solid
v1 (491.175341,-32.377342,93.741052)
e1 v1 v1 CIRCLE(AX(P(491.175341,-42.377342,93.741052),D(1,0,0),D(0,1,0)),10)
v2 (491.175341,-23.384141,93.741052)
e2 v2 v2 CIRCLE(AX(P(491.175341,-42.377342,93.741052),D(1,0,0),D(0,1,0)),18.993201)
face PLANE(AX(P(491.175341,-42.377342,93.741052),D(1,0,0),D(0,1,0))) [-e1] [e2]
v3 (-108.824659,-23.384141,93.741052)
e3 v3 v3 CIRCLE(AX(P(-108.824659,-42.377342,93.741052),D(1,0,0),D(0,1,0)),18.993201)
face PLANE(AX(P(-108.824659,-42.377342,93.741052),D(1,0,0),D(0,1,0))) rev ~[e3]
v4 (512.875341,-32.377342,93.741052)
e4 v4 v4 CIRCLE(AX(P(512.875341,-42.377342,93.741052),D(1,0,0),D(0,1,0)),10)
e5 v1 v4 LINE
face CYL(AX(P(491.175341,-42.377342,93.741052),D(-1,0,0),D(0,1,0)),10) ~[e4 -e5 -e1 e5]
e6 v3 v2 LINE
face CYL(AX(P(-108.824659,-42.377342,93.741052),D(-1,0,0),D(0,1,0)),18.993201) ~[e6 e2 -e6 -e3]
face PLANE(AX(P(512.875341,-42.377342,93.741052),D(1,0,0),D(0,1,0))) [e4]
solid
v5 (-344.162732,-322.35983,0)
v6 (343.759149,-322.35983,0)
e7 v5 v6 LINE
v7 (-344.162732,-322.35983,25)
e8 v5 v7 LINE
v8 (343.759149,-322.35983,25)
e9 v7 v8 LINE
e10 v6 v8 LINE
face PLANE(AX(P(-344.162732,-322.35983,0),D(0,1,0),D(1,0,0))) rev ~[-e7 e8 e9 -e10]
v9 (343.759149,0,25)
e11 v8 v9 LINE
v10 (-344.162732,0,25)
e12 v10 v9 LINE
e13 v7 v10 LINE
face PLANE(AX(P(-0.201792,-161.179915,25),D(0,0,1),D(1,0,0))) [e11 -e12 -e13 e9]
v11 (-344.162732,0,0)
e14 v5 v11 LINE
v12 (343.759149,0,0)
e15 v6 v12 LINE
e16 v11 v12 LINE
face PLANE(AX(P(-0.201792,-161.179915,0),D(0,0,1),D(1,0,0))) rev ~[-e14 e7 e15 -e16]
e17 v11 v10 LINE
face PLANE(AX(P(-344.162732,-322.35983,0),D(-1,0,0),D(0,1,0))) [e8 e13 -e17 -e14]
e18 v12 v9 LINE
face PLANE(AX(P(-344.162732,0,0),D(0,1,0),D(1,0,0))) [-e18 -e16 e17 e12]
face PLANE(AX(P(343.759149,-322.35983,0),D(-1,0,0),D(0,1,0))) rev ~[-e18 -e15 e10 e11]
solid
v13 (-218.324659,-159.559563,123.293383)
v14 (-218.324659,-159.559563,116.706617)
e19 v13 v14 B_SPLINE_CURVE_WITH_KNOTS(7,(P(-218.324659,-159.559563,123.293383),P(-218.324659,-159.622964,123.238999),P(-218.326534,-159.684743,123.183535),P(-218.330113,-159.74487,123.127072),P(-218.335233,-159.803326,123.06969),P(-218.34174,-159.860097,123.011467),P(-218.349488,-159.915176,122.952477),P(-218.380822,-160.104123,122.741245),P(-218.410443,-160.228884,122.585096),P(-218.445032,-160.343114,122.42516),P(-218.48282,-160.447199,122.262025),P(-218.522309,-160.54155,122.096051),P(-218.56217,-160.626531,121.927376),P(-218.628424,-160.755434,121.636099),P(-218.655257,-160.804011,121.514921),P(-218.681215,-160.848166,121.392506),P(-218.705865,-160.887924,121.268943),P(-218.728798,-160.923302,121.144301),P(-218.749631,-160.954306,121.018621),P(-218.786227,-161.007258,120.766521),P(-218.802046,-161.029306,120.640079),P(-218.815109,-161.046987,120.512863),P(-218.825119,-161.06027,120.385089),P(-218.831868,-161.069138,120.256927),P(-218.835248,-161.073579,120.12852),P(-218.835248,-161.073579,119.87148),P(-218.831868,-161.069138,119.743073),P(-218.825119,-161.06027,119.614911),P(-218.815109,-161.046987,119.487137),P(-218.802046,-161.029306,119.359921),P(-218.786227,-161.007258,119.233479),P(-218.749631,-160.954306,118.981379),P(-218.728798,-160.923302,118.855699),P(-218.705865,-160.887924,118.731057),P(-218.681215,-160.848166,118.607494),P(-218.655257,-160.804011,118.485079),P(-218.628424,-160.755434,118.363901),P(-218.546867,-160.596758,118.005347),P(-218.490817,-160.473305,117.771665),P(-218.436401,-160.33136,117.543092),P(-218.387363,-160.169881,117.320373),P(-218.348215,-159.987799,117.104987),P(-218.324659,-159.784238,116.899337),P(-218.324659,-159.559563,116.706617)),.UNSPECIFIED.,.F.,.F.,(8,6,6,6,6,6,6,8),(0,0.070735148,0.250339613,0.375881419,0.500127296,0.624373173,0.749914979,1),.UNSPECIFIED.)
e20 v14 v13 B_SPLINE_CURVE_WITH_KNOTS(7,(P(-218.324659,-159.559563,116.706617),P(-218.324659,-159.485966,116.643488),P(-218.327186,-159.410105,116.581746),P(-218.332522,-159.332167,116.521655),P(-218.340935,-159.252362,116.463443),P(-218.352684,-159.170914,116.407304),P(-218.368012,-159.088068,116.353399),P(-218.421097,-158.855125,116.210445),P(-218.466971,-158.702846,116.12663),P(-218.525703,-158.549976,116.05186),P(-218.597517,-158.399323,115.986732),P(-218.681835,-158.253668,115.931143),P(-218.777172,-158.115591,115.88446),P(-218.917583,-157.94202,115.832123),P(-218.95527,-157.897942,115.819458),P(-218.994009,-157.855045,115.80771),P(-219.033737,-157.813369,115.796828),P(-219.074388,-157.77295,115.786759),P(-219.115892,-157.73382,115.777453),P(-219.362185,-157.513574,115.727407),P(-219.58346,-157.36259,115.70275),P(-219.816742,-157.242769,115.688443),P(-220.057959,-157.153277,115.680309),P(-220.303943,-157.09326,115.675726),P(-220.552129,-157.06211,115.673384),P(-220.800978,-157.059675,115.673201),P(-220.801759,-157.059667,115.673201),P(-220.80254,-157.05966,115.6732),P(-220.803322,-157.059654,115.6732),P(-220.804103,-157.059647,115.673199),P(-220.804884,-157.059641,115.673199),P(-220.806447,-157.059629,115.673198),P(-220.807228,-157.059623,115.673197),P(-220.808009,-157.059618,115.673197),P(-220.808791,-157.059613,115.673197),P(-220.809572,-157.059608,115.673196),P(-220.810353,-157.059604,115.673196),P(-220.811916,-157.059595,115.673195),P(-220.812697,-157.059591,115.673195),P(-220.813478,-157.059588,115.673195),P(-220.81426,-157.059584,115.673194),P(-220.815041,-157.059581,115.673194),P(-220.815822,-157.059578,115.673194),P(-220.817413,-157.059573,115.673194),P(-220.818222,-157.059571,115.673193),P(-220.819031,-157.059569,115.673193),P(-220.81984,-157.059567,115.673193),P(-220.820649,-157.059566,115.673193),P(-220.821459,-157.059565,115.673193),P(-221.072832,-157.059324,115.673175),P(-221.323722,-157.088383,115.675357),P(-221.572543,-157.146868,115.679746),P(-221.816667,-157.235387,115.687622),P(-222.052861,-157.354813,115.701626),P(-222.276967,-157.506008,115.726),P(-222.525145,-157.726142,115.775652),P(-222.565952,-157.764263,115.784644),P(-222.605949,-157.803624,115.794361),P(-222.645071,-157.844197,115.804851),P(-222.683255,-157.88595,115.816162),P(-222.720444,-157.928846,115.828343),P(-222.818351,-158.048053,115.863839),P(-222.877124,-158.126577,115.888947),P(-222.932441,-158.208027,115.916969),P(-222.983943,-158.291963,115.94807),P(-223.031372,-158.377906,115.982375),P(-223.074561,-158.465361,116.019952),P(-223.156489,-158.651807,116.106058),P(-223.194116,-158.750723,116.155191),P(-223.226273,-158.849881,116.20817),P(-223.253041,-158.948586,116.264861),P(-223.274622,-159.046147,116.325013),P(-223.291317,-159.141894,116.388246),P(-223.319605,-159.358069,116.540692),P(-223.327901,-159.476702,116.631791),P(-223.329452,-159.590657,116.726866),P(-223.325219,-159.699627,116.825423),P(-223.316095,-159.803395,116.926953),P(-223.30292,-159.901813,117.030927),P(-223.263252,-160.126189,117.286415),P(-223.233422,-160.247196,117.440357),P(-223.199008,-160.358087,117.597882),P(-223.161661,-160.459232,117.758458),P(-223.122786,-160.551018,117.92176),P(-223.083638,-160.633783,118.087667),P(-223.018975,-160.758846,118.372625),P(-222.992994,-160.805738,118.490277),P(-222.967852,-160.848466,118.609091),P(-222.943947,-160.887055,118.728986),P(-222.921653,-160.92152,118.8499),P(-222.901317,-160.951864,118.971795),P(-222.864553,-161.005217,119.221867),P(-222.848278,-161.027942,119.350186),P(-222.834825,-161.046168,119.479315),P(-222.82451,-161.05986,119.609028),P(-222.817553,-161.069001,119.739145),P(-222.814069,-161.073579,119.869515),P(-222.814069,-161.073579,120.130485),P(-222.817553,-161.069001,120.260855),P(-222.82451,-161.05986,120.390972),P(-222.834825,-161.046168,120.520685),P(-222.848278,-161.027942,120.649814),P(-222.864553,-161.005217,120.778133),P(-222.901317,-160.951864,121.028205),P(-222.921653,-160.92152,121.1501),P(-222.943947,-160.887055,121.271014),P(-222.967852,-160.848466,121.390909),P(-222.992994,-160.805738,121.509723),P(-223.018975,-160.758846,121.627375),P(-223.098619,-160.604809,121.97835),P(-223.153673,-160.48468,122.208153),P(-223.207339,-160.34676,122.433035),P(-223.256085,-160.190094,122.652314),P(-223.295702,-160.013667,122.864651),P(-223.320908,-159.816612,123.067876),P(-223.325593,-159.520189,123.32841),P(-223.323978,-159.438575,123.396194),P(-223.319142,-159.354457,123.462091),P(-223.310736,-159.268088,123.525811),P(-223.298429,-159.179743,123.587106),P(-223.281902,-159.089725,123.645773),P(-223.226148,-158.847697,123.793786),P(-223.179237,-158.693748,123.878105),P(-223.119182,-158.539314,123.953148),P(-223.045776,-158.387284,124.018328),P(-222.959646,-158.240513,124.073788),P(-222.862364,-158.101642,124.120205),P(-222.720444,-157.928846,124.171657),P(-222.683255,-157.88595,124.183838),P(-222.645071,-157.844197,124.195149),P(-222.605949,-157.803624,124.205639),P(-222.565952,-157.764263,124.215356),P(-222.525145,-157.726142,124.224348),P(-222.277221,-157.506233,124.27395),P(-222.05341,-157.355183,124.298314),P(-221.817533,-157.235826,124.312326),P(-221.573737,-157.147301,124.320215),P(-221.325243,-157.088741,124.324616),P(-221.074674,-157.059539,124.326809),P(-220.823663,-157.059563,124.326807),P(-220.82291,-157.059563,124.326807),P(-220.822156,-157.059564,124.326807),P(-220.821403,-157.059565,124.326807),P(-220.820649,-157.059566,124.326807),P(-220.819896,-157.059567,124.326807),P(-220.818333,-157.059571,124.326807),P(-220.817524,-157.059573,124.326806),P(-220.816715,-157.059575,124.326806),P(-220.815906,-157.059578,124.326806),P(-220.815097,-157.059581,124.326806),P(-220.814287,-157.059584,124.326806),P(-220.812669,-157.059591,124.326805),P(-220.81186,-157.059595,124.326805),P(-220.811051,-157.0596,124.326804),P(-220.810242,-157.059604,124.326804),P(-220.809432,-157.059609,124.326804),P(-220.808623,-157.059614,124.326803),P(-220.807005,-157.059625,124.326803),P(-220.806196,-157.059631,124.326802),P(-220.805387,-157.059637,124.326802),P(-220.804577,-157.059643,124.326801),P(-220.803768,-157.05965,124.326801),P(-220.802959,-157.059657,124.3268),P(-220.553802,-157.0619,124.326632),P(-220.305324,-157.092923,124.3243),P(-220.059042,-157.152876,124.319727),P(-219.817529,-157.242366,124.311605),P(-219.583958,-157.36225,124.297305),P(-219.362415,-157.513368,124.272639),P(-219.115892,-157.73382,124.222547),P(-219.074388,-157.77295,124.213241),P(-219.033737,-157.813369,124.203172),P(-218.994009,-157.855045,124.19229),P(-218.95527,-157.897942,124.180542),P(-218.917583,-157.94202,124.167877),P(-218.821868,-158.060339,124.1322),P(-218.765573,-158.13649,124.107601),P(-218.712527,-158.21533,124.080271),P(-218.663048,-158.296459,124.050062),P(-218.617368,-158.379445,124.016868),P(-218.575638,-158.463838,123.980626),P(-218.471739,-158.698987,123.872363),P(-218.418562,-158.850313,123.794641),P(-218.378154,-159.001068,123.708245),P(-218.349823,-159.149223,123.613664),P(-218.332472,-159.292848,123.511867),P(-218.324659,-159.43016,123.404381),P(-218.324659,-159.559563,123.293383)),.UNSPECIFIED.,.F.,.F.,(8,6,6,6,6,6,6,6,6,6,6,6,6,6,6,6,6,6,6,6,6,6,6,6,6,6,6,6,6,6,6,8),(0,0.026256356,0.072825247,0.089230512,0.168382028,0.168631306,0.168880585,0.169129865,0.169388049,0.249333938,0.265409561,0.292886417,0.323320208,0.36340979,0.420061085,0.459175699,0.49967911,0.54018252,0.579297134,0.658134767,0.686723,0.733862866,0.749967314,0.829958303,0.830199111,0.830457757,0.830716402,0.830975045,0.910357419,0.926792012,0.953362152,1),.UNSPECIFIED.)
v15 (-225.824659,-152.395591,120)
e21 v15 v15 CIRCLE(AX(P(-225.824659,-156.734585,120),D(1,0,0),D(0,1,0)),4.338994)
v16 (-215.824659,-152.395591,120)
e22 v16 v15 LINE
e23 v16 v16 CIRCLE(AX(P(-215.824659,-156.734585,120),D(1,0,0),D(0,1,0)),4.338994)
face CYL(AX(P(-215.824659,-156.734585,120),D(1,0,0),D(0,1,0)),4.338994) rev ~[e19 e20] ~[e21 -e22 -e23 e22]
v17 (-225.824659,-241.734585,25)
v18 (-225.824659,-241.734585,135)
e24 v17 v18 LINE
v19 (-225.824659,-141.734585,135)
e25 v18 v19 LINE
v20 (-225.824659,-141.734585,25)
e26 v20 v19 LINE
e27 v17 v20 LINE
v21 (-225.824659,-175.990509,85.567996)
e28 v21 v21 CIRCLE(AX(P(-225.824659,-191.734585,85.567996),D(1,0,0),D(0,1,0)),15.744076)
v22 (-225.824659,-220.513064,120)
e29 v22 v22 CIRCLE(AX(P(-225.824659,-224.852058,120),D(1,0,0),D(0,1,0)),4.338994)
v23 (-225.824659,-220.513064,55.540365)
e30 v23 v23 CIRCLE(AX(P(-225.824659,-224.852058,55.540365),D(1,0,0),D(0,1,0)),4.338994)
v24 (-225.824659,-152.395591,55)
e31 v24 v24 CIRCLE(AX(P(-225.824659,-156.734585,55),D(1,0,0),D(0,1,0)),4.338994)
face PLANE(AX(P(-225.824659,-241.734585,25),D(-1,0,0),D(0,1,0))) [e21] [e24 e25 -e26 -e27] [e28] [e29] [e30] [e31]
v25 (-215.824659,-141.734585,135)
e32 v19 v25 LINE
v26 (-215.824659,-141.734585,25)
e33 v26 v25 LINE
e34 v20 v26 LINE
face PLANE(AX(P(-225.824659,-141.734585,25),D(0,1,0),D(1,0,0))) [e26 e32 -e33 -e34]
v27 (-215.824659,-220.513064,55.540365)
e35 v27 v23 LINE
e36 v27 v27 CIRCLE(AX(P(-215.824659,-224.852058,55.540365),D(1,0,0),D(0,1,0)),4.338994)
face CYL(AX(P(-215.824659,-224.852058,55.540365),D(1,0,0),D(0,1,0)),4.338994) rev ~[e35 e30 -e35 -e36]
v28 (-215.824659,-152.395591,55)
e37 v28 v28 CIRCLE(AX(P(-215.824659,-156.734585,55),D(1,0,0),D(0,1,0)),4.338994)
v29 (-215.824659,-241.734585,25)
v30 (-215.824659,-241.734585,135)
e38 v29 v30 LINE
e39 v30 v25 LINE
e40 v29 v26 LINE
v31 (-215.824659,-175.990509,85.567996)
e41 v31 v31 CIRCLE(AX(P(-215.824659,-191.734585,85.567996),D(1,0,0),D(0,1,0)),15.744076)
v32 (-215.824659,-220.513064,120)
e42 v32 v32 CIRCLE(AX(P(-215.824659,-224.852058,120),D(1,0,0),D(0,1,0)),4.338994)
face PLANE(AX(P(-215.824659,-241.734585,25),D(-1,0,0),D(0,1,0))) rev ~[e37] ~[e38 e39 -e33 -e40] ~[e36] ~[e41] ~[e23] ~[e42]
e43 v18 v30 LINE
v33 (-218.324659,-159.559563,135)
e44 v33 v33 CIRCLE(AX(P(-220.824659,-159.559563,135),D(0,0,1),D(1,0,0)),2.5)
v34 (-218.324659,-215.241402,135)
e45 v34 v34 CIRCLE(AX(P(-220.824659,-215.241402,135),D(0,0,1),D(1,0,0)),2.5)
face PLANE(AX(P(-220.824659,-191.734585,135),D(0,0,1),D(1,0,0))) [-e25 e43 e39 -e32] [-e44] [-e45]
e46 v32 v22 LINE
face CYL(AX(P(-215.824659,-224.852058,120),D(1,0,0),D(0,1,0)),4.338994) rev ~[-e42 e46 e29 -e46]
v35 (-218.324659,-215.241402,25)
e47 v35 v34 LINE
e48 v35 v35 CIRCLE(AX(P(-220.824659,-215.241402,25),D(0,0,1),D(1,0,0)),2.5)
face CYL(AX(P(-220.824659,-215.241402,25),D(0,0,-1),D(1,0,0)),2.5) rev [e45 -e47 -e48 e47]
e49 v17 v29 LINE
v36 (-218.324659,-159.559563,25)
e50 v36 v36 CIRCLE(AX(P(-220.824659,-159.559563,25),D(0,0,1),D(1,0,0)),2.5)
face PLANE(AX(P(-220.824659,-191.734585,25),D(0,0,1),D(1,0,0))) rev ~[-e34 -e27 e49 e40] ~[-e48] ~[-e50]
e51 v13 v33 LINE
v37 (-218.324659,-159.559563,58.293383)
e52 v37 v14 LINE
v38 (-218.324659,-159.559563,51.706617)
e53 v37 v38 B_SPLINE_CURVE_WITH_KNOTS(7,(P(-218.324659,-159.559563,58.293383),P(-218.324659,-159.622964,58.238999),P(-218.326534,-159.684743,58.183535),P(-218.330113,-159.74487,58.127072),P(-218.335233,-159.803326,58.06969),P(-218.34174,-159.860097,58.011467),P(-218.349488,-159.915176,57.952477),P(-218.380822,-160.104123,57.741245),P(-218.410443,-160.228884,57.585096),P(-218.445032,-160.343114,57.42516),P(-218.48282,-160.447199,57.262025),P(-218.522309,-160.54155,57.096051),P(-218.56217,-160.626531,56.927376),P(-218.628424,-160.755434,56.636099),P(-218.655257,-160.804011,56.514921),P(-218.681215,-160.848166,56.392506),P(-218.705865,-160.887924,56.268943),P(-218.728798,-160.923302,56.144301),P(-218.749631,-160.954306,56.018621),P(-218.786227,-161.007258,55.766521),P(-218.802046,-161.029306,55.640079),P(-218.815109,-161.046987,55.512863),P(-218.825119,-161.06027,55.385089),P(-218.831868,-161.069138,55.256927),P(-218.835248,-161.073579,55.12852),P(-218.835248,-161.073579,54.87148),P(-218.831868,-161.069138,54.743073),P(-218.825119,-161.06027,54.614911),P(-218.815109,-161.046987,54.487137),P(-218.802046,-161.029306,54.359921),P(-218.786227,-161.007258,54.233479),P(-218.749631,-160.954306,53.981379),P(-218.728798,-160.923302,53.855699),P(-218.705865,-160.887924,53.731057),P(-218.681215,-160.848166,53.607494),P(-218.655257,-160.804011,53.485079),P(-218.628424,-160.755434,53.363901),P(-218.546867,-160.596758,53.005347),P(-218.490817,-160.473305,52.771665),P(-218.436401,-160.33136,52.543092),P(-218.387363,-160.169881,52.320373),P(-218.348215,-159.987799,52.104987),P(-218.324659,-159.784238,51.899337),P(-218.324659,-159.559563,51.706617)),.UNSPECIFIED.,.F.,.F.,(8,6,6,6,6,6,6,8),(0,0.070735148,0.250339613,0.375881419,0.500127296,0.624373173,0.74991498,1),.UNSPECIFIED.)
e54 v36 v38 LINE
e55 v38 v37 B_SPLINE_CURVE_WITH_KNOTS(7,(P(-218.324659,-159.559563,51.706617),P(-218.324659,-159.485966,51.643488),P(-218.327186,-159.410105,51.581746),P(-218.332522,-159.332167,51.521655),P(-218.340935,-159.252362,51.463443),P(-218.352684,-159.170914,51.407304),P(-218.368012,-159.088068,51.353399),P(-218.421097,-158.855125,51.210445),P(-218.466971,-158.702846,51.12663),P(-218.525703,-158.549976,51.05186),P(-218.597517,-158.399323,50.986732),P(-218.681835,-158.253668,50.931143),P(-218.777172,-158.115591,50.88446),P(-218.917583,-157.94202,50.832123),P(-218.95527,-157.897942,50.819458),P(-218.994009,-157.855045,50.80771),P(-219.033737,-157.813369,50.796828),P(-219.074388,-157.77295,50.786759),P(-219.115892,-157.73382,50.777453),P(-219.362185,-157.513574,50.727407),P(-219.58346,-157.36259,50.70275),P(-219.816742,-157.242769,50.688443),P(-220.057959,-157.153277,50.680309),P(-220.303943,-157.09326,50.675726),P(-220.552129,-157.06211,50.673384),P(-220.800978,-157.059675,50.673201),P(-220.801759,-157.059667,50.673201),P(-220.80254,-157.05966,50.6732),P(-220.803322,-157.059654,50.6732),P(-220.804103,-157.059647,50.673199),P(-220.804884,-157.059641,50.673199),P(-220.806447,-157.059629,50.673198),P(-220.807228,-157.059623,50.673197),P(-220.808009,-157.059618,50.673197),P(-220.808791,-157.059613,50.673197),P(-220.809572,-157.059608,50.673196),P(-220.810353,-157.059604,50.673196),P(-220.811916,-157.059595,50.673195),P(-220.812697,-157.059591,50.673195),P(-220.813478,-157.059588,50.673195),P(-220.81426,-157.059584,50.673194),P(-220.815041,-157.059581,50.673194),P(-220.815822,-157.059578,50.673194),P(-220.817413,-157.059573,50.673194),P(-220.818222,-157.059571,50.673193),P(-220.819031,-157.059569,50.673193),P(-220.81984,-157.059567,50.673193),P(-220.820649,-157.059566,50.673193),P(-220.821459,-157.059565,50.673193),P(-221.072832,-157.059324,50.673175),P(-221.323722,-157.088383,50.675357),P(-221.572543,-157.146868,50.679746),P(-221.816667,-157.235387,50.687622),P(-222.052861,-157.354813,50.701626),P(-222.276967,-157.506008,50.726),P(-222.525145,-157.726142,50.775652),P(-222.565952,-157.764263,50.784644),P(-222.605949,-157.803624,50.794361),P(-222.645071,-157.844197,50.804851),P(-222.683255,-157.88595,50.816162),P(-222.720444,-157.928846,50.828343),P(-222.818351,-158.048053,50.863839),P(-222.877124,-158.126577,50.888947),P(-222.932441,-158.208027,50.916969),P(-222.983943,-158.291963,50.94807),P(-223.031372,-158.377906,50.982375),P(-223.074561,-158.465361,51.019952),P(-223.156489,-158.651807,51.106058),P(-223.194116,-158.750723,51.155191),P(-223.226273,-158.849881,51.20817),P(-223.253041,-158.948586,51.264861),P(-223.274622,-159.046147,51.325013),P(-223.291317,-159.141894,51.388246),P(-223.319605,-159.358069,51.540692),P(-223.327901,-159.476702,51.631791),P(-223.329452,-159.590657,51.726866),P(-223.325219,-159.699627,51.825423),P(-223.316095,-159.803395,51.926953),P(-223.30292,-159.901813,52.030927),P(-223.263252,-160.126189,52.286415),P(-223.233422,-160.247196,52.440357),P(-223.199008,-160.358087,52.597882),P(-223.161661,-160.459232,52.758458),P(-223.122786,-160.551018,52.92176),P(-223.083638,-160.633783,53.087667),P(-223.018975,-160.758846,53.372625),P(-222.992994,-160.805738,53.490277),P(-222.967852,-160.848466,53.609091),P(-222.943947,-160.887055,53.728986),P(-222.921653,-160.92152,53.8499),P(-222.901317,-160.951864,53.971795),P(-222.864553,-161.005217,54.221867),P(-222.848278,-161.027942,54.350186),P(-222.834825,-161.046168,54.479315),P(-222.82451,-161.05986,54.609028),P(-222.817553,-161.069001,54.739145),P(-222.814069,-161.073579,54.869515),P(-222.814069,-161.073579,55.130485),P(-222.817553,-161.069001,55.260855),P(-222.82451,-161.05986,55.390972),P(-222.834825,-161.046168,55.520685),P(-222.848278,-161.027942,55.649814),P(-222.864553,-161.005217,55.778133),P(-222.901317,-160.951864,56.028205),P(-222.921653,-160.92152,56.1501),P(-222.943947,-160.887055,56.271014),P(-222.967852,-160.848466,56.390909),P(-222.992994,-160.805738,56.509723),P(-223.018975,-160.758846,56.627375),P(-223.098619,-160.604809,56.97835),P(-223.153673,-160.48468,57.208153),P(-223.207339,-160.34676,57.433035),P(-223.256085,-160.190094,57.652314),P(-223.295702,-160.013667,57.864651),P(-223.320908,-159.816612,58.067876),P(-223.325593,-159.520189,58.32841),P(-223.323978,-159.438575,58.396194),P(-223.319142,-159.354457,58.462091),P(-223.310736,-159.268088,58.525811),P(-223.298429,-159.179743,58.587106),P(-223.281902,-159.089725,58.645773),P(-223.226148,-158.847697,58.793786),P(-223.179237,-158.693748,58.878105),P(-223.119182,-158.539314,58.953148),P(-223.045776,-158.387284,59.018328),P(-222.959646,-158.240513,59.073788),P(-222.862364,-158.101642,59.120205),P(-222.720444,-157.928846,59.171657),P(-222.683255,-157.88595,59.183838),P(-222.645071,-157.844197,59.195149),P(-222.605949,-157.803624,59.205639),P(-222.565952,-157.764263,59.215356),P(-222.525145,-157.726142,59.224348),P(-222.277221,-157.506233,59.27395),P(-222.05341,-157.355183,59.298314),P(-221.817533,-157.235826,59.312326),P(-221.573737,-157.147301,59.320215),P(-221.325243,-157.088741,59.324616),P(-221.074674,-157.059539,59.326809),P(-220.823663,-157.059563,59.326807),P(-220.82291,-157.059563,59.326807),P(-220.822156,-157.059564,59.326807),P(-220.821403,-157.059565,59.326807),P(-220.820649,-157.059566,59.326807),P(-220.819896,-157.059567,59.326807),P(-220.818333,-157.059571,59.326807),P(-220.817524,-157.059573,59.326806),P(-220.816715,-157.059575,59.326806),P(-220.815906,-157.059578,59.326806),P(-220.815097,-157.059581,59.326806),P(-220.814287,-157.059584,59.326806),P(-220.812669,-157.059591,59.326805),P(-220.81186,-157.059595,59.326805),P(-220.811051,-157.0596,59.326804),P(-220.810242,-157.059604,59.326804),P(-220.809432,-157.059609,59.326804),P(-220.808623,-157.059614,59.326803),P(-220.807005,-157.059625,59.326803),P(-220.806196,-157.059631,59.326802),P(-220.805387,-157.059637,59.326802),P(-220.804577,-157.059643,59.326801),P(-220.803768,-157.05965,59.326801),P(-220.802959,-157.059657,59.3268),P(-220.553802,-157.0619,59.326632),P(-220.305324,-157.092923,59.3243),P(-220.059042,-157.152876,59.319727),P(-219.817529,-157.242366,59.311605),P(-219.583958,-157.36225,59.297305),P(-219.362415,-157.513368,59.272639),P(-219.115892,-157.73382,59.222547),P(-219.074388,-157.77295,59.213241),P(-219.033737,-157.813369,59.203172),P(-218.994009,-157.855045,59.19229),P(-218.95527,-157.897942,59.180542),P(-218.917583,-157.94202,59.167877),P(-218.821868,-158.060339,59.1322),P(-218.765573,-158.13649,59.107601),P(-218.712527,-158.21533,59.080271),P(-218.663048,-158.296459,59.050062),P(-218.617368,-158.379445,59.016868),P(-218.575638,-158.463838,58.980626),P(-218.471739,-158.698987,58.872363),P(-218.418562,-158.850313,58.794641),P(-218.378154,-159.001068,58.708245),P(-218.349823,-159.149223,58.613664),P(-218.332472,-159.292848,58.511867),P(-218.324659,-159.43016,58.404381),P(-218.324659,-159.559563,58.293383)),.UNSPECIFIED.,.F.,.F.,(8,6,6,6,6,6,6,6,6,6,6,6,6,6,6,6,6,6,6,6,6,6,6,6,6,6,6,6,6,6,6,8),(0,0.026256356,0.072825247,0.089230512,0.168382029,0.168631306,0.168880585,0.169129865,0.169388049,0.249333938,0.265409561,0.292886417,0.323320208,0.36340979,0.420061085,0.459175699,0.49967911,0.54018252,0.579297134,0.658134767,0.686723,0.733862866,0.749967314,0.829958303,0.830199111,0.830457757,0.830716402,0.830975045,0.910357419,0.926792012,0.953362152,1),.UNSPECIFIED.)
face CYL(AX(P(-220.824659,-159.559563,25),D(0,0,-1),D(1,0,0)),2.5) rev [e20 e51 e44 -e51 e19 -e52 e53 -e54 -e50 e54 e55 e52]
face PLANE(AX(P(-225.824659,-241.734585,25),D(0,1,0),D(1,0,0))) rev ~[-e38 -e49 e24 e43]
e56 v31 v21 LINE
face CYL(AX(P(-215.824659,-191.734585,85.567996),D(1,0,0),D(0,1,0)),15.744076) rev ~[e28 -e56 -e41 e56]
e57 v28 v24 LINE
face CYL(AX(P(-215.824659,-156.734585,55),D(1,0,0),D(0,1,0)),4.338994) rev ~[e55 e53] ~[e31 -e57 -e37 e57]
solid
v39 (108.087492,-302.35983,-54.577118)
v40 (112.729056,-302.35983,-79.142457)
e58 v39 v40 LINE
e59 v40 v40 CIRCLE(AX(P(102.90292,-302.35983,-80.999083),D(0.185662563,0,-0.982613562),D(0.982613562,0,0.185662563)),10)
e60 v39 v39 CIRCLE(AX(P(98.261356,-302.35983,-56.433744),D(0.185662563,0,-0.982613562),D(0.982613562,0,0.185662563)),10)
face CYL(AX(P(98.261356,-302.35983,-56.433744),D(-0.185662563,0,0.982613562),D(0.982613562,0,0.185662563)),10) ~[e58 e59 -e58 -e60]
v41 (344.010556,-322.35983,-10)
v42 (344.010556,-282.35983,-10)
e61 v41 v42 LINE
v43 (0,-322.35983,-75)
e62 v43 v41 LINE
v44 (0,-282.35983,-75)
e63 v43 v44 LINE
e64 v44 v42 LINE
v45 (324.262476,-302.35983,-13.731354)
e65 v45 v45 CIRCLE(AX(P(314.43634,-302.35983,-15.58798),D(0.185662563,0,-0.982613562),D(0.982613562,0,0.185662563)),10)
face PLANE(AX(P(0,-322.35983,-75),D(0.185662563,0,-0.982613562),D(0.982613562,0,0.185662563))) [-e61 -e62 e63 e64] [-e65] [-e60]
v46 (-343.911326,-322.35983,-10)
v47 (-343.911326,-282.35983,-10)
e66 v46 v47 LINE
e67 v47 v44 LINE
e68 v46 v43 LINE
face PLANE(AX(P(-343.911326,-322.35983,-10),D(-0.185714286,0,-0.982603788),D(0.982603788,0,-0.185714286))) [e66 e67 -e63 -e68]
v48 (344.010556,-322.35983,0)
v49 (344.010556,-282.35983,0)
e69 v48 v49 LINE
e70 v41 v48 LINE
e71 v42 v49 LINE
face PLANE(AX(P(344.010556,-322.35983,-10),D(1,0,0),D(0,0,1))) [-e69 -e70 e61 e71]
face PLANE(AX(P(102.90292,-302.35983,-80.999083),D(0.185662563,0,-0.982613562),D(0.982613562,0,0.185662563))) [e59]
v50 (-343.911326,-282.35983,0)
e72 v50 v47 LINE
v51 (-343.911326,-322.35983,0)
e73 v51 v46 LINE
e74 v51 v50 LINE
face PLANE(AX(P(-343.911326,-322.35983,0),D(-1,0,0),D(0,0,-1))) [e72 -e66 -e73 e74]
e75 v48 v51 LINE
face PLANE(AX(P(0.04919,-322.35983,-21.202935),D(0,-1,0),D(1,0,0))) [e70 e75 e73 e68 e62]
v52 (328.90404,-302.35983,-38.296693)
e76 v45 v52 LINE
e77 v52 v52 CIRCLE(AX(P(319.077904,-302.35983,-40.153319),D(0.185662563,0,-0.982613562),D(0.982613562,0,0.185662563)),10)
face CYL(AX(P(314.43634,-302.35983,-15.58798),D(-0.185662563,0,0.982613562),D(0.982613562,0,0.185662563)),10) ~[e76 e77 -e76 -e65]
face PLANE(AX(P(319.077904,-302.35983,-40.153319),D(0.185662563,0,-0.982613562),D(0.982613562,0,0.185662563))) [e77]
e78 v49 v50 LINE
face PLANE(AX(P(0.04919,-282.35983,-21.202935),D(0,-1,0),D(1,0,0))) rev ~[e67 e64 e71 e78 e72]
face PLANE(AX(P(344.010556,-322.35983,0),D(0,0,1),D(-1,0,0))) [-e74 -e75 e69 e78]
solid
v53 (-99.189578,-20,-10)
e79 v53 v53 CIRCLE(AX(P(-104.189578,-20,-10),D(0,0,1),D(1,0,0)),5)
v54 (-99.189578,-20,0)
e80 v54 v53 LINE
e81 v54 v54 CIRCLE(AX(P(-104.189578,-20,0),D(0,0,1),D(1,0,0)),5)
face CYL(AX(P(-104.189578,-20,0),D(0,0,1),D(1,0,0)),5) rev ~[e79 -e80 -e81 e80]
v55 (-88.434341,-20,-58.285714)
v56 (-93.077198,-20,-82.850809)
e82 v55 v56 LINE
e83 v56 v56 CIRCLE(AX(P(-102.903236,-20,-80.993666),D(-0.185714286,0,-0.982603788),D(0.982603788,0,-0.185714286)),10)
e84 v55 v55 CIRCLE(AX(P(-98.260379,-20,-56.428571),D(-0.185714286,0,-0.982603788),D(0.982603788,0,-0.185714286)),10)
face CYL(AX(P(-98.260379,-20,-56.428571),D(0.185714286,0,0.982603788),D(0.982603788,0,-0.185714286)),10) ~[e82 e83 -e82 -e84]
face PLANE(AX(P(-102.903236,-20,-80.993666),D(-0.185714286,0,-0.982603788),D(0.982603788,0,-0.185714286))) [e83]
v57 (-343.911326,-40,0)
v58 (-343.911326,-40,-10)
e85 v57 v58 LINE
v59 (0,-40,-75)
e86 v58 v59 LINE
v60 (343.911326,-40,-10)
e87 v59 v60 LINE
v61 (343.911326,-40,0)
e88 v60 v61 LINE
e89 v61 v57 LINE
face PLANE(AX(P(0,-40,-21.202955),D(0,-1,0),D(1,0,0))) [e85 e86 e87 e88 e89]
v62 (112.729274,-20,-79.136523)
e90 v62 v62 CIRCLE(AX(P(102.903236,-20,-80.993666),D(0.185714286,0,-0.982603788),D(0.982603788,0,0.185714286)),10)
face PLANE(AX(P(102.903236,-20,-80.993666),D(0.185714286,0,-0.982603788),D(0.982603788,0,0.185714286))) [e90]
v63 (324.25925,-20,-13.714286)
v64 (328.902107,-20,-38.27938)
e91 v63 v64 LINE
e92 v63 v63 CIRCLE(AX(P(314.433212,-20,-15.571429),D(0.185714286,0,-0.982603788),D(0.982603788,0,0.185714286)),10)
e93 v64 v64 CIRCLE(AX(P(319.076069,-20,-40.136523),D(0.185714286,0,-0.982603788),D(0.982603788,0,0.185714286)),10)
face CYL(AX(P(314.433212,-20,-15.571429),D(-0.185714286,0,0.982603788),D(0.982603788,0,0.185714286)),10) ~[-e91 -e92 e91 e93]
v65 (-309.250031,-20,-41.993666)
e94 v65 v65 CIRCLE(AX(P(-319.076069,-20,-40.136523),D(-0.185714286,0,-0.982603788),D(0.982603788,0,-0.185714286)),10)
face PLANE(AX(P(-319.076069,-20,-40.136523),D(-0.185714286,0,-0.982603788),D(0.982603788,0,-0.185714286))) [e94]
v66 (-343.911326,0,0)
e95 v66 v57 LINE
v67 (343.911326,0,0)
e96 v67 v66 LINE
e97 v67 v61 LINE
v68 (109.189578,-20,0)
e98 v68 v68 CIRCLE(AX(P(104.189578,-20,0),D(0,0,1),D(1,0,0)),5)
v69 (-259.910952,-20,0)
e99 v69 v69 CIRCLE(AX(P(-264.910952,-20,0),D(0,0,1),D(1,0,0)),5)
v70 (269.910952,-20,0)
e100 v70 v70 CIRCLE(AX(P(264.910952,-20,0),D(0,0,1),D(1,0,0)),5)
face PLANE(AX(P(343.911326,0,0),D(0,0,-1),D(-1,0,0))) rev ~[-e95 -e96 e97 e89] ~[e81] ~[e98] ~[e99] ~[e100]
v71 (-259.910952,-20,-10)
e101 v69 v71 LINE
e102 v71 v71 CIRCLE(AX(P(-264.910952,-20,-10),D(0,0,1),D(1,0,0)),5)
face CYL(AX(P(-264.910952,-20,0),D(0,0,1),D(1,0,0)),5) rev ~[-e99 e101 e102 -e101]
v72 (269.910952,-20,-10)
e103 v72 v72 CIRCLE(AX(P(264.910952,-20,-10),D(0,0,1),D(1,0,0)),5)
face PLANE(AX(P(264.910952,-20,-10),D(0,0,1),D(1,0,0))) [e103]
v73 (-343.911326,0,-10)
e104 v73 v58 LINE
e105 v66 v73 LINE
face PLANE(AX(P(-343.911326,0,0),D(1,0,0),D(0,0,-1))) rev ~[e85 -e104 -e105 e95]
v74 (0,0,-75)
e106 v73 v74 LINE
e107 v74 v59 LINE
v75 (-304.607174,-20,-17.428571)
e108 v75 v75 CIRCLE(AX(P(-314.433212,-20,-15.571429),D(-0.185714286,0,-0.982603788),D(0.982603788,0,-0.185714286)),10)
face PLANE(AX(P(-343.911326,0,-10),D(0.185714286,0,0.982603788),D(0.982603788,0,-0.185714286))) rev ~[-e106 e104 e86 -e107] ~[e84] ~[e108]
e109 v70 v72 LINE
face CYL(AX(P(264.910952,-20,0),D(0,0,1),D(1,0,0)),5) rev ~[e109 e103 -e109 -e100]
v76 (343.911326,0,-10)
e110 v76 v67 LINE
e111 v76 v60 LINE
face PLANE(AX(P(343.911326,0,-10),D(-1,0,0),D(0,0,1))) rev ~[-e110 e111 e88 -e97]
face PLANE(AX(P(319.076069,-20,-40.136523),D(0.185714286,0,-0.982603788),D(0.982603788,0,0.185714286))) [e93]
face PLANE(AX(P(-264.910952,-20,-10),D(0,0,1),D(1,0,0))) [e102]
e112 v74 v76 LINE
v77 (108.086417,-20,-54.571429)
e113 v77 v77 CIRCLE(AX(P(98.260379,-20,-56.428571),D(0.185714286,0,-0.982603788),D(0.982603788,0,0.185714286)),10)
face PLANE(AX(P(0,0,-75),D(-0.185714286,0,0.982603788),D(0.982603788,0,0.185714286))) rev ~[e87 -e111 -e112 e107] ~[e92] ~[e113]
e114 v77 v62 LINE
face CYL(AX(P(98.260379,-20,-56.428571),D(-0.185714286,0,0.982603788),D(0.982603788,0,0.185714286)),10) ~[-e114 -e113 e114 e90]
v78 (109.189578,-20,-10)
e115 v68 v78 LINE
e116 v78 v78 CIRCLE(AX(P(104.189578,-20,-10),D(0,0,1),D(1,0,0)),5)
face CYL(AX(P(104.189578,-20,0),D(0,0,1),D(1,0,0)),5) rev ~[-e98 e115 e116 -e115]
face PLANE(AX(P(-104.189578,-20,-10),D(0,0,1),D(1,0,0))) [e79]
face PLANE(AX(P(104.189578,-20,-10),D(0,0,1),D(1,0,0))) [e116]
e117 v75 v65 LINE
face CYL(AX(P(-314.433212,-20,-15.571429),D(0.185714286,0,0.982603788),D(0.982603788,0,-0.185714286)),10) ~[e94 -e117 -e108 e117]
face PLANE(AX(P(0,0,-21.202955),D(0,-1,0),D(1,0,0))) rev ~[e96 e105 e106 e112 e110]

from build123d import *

# Parameters (mm, degrees)
F1_DEPTH  = 40
F2_R      = 5
F3_DEPTH  = 10
F4_R      = 10
F5_DEPTH  = 25
F6_R      = 10
F7_DEPTH  = 25
F8_W      = 687.9218816757
F8_H      = 322.3598301411
F9_DEPTH  = 25
F11_DEPTH = 40
F12_R     = 10
F13_DEPTH = 25
F14_W     = 10
F14_H     = 100
F14_R     = 2.5
F15_DEPTH = 110
F16_R     = 4.3389942533
F16_R_2   = 15.7440759203
F17_DEPTH = 66
F20_R     = 18.9932010267
F21_DEPTH = 600
F22_R     = 10
F23_DEPTH = 21.7


# Not quite as in the source:
# - the program builds the solid bodies; features that only make, move or delete a surface that nothing else refers to are left out


with BuildPart() as f1:
    # F0 (on Front) → F1 (new body)
    with BuildSketch(Plane.XZ):
        Polygon((343.9113257804, 0), (-343.9113257804, 0), (-343.9113257804, -10), (0, -75), (343.9113257804, -10), align=None)
    extrude(amount=F1_DEPTH)

    # F2 (on face) → F3 (cut)
    with BuildSketch(Plane.XY):
        with Locations((-264.9109515785, -20)):
            Circle(F2_R)
        with Locations((-104.1895777367, -20)):
            Circle(F2_R)
        with Locations((104.1895777367, -20)):
            Circle(F2_R)
        with Locations((264.9109515785, -20)):
            Circle(F2_R)
    extrude(amount=-F3_DEPTH, mode=Mode.SUBTRACT)

    # F4 (on face) → F5 (join)
    with BuildSketch(Plane(origin=(-13.6862670464, 0, -72.4132653061), x_dir=(0.9826037879, 0, -0.1857142857), z_dir=(-0.1857142857, 0, -0.9826037879))):
        with Locations((-306.0714285714, 20)):
            Circle(F4_R)
        with Locations((-86.0714285714, 20)):
            Circle(F4_R)
    extrude(amount=F5_DEPTH)

    # F6 (on face) → F7 (join)
    with BuildSketch(Plane(origin=(13.6862670464, 0, -72.4132653061), x_dir=(0.9826037879, 0, 0.1857142857), z_dir=(0.1857142857, 0, -0.9826037879))):
        with Locations((306.0714285714, 20)):
            Circle(F6_R)
        with Locations((86.0714285714, 20)):
            Circle(F6_R)
    extrude(amount=F7_DEPTH)


with BuildPart() as f9:
    # F8 (on Top) → F9 (new body)
    with BuildSketch(Plane.XY):
        with Locations((-0.2017915249, -161.1799150705)):
            Rectangle(F8_W, F8_H)
    extrude(amount=F9_DEPTH)


with BuildPart() as f11:
    # F10 (on face) → F11 (new body)
    with BuildSketch(Plane.XZ.offset(322.3598301411)):
        Polygon((344.0105558954, 0), (-343.9113257804, 0), (-343.9113257804, -10), (0, -75), (344.0105558954, -10), align=None)
    extrude(amount=-F11_DEPTH)

    # F12 (on face) → F13 (join)
    with BuildSketch(Plane(origin=(13.6825914381, 0, -72.4147059495), x_dir=(0.9826135622, 0, 0.1856625631), z_dir=(0.1856625631, 0, -0.9826135622))):
        with Locations((306.0753077668, 302.3598301411)):
            Circle(F12_R)
        with Locations((86.0753077668, 302.3598301411)):
            Circle(F12_R)
    extrude(amount=F13_DEPTH)


with BuildPart() as f15:
    # F14 (on face) → F15 (new body)
    with BuildSketch(Plane.XY.offset(25)):
        with Locations((-220.8246585727, -191.7345849391)):
            Rectangle(F14_W, F14_H)
        with Locations((-220.8246585727, -215.2414023876)):
            Circle(F14_R, mode=Mode.SUBTRACT)
        with Locations((-220.8246585727, -159.5595628023)):
            Circle(F14_R, mode=Mode.SUBTRACT)
    extrude(amount=F15_DEPTH)

    # F16 (on face) → F17 (cut)
    with BuildSketch(Plane.YZ.offset(-215.8246585727)):
        with Locations((-156.7345849391, 120)):
            Circle(F16_R)
        with Locations((-156.7345849391, 55)):
            Circle(F16_R)
        with Locations((-224.8520583823, 120)):
            Circle(F16_R)
        with Locations((-224.8520583823, 55.5403646578)):
            Circle(F16_R)
        with Locations((-191.7345849391, 85.5679959059)):
            Circle(F16_R_2)
    extrude(amount=-F17_DEPTH, mode=Mode.SUBTRACT)


with BuildPart() as f21:
    # F20 (on offset) → F21 (new body)
    with BuildSketch(Plane.YZ.offset(-108.8246585727)):
        with Locations((-42.3773415387, 93.7410518527)):
            Circle(F20_R)
    extrude(amount=F21_DEPTH)

    # F22 (on face) → F23 (join)
    with BuildSketch(Plane.YZ.offset(491.1753414273)):
        with Locations((-42.3773415387, 93.7410518527)):
            Circle(F22_R)
    extrude(amount=F23_DEPTH)


solid = Compound([f1.part, f9.part, f11.part, f15.part, f21.part])
